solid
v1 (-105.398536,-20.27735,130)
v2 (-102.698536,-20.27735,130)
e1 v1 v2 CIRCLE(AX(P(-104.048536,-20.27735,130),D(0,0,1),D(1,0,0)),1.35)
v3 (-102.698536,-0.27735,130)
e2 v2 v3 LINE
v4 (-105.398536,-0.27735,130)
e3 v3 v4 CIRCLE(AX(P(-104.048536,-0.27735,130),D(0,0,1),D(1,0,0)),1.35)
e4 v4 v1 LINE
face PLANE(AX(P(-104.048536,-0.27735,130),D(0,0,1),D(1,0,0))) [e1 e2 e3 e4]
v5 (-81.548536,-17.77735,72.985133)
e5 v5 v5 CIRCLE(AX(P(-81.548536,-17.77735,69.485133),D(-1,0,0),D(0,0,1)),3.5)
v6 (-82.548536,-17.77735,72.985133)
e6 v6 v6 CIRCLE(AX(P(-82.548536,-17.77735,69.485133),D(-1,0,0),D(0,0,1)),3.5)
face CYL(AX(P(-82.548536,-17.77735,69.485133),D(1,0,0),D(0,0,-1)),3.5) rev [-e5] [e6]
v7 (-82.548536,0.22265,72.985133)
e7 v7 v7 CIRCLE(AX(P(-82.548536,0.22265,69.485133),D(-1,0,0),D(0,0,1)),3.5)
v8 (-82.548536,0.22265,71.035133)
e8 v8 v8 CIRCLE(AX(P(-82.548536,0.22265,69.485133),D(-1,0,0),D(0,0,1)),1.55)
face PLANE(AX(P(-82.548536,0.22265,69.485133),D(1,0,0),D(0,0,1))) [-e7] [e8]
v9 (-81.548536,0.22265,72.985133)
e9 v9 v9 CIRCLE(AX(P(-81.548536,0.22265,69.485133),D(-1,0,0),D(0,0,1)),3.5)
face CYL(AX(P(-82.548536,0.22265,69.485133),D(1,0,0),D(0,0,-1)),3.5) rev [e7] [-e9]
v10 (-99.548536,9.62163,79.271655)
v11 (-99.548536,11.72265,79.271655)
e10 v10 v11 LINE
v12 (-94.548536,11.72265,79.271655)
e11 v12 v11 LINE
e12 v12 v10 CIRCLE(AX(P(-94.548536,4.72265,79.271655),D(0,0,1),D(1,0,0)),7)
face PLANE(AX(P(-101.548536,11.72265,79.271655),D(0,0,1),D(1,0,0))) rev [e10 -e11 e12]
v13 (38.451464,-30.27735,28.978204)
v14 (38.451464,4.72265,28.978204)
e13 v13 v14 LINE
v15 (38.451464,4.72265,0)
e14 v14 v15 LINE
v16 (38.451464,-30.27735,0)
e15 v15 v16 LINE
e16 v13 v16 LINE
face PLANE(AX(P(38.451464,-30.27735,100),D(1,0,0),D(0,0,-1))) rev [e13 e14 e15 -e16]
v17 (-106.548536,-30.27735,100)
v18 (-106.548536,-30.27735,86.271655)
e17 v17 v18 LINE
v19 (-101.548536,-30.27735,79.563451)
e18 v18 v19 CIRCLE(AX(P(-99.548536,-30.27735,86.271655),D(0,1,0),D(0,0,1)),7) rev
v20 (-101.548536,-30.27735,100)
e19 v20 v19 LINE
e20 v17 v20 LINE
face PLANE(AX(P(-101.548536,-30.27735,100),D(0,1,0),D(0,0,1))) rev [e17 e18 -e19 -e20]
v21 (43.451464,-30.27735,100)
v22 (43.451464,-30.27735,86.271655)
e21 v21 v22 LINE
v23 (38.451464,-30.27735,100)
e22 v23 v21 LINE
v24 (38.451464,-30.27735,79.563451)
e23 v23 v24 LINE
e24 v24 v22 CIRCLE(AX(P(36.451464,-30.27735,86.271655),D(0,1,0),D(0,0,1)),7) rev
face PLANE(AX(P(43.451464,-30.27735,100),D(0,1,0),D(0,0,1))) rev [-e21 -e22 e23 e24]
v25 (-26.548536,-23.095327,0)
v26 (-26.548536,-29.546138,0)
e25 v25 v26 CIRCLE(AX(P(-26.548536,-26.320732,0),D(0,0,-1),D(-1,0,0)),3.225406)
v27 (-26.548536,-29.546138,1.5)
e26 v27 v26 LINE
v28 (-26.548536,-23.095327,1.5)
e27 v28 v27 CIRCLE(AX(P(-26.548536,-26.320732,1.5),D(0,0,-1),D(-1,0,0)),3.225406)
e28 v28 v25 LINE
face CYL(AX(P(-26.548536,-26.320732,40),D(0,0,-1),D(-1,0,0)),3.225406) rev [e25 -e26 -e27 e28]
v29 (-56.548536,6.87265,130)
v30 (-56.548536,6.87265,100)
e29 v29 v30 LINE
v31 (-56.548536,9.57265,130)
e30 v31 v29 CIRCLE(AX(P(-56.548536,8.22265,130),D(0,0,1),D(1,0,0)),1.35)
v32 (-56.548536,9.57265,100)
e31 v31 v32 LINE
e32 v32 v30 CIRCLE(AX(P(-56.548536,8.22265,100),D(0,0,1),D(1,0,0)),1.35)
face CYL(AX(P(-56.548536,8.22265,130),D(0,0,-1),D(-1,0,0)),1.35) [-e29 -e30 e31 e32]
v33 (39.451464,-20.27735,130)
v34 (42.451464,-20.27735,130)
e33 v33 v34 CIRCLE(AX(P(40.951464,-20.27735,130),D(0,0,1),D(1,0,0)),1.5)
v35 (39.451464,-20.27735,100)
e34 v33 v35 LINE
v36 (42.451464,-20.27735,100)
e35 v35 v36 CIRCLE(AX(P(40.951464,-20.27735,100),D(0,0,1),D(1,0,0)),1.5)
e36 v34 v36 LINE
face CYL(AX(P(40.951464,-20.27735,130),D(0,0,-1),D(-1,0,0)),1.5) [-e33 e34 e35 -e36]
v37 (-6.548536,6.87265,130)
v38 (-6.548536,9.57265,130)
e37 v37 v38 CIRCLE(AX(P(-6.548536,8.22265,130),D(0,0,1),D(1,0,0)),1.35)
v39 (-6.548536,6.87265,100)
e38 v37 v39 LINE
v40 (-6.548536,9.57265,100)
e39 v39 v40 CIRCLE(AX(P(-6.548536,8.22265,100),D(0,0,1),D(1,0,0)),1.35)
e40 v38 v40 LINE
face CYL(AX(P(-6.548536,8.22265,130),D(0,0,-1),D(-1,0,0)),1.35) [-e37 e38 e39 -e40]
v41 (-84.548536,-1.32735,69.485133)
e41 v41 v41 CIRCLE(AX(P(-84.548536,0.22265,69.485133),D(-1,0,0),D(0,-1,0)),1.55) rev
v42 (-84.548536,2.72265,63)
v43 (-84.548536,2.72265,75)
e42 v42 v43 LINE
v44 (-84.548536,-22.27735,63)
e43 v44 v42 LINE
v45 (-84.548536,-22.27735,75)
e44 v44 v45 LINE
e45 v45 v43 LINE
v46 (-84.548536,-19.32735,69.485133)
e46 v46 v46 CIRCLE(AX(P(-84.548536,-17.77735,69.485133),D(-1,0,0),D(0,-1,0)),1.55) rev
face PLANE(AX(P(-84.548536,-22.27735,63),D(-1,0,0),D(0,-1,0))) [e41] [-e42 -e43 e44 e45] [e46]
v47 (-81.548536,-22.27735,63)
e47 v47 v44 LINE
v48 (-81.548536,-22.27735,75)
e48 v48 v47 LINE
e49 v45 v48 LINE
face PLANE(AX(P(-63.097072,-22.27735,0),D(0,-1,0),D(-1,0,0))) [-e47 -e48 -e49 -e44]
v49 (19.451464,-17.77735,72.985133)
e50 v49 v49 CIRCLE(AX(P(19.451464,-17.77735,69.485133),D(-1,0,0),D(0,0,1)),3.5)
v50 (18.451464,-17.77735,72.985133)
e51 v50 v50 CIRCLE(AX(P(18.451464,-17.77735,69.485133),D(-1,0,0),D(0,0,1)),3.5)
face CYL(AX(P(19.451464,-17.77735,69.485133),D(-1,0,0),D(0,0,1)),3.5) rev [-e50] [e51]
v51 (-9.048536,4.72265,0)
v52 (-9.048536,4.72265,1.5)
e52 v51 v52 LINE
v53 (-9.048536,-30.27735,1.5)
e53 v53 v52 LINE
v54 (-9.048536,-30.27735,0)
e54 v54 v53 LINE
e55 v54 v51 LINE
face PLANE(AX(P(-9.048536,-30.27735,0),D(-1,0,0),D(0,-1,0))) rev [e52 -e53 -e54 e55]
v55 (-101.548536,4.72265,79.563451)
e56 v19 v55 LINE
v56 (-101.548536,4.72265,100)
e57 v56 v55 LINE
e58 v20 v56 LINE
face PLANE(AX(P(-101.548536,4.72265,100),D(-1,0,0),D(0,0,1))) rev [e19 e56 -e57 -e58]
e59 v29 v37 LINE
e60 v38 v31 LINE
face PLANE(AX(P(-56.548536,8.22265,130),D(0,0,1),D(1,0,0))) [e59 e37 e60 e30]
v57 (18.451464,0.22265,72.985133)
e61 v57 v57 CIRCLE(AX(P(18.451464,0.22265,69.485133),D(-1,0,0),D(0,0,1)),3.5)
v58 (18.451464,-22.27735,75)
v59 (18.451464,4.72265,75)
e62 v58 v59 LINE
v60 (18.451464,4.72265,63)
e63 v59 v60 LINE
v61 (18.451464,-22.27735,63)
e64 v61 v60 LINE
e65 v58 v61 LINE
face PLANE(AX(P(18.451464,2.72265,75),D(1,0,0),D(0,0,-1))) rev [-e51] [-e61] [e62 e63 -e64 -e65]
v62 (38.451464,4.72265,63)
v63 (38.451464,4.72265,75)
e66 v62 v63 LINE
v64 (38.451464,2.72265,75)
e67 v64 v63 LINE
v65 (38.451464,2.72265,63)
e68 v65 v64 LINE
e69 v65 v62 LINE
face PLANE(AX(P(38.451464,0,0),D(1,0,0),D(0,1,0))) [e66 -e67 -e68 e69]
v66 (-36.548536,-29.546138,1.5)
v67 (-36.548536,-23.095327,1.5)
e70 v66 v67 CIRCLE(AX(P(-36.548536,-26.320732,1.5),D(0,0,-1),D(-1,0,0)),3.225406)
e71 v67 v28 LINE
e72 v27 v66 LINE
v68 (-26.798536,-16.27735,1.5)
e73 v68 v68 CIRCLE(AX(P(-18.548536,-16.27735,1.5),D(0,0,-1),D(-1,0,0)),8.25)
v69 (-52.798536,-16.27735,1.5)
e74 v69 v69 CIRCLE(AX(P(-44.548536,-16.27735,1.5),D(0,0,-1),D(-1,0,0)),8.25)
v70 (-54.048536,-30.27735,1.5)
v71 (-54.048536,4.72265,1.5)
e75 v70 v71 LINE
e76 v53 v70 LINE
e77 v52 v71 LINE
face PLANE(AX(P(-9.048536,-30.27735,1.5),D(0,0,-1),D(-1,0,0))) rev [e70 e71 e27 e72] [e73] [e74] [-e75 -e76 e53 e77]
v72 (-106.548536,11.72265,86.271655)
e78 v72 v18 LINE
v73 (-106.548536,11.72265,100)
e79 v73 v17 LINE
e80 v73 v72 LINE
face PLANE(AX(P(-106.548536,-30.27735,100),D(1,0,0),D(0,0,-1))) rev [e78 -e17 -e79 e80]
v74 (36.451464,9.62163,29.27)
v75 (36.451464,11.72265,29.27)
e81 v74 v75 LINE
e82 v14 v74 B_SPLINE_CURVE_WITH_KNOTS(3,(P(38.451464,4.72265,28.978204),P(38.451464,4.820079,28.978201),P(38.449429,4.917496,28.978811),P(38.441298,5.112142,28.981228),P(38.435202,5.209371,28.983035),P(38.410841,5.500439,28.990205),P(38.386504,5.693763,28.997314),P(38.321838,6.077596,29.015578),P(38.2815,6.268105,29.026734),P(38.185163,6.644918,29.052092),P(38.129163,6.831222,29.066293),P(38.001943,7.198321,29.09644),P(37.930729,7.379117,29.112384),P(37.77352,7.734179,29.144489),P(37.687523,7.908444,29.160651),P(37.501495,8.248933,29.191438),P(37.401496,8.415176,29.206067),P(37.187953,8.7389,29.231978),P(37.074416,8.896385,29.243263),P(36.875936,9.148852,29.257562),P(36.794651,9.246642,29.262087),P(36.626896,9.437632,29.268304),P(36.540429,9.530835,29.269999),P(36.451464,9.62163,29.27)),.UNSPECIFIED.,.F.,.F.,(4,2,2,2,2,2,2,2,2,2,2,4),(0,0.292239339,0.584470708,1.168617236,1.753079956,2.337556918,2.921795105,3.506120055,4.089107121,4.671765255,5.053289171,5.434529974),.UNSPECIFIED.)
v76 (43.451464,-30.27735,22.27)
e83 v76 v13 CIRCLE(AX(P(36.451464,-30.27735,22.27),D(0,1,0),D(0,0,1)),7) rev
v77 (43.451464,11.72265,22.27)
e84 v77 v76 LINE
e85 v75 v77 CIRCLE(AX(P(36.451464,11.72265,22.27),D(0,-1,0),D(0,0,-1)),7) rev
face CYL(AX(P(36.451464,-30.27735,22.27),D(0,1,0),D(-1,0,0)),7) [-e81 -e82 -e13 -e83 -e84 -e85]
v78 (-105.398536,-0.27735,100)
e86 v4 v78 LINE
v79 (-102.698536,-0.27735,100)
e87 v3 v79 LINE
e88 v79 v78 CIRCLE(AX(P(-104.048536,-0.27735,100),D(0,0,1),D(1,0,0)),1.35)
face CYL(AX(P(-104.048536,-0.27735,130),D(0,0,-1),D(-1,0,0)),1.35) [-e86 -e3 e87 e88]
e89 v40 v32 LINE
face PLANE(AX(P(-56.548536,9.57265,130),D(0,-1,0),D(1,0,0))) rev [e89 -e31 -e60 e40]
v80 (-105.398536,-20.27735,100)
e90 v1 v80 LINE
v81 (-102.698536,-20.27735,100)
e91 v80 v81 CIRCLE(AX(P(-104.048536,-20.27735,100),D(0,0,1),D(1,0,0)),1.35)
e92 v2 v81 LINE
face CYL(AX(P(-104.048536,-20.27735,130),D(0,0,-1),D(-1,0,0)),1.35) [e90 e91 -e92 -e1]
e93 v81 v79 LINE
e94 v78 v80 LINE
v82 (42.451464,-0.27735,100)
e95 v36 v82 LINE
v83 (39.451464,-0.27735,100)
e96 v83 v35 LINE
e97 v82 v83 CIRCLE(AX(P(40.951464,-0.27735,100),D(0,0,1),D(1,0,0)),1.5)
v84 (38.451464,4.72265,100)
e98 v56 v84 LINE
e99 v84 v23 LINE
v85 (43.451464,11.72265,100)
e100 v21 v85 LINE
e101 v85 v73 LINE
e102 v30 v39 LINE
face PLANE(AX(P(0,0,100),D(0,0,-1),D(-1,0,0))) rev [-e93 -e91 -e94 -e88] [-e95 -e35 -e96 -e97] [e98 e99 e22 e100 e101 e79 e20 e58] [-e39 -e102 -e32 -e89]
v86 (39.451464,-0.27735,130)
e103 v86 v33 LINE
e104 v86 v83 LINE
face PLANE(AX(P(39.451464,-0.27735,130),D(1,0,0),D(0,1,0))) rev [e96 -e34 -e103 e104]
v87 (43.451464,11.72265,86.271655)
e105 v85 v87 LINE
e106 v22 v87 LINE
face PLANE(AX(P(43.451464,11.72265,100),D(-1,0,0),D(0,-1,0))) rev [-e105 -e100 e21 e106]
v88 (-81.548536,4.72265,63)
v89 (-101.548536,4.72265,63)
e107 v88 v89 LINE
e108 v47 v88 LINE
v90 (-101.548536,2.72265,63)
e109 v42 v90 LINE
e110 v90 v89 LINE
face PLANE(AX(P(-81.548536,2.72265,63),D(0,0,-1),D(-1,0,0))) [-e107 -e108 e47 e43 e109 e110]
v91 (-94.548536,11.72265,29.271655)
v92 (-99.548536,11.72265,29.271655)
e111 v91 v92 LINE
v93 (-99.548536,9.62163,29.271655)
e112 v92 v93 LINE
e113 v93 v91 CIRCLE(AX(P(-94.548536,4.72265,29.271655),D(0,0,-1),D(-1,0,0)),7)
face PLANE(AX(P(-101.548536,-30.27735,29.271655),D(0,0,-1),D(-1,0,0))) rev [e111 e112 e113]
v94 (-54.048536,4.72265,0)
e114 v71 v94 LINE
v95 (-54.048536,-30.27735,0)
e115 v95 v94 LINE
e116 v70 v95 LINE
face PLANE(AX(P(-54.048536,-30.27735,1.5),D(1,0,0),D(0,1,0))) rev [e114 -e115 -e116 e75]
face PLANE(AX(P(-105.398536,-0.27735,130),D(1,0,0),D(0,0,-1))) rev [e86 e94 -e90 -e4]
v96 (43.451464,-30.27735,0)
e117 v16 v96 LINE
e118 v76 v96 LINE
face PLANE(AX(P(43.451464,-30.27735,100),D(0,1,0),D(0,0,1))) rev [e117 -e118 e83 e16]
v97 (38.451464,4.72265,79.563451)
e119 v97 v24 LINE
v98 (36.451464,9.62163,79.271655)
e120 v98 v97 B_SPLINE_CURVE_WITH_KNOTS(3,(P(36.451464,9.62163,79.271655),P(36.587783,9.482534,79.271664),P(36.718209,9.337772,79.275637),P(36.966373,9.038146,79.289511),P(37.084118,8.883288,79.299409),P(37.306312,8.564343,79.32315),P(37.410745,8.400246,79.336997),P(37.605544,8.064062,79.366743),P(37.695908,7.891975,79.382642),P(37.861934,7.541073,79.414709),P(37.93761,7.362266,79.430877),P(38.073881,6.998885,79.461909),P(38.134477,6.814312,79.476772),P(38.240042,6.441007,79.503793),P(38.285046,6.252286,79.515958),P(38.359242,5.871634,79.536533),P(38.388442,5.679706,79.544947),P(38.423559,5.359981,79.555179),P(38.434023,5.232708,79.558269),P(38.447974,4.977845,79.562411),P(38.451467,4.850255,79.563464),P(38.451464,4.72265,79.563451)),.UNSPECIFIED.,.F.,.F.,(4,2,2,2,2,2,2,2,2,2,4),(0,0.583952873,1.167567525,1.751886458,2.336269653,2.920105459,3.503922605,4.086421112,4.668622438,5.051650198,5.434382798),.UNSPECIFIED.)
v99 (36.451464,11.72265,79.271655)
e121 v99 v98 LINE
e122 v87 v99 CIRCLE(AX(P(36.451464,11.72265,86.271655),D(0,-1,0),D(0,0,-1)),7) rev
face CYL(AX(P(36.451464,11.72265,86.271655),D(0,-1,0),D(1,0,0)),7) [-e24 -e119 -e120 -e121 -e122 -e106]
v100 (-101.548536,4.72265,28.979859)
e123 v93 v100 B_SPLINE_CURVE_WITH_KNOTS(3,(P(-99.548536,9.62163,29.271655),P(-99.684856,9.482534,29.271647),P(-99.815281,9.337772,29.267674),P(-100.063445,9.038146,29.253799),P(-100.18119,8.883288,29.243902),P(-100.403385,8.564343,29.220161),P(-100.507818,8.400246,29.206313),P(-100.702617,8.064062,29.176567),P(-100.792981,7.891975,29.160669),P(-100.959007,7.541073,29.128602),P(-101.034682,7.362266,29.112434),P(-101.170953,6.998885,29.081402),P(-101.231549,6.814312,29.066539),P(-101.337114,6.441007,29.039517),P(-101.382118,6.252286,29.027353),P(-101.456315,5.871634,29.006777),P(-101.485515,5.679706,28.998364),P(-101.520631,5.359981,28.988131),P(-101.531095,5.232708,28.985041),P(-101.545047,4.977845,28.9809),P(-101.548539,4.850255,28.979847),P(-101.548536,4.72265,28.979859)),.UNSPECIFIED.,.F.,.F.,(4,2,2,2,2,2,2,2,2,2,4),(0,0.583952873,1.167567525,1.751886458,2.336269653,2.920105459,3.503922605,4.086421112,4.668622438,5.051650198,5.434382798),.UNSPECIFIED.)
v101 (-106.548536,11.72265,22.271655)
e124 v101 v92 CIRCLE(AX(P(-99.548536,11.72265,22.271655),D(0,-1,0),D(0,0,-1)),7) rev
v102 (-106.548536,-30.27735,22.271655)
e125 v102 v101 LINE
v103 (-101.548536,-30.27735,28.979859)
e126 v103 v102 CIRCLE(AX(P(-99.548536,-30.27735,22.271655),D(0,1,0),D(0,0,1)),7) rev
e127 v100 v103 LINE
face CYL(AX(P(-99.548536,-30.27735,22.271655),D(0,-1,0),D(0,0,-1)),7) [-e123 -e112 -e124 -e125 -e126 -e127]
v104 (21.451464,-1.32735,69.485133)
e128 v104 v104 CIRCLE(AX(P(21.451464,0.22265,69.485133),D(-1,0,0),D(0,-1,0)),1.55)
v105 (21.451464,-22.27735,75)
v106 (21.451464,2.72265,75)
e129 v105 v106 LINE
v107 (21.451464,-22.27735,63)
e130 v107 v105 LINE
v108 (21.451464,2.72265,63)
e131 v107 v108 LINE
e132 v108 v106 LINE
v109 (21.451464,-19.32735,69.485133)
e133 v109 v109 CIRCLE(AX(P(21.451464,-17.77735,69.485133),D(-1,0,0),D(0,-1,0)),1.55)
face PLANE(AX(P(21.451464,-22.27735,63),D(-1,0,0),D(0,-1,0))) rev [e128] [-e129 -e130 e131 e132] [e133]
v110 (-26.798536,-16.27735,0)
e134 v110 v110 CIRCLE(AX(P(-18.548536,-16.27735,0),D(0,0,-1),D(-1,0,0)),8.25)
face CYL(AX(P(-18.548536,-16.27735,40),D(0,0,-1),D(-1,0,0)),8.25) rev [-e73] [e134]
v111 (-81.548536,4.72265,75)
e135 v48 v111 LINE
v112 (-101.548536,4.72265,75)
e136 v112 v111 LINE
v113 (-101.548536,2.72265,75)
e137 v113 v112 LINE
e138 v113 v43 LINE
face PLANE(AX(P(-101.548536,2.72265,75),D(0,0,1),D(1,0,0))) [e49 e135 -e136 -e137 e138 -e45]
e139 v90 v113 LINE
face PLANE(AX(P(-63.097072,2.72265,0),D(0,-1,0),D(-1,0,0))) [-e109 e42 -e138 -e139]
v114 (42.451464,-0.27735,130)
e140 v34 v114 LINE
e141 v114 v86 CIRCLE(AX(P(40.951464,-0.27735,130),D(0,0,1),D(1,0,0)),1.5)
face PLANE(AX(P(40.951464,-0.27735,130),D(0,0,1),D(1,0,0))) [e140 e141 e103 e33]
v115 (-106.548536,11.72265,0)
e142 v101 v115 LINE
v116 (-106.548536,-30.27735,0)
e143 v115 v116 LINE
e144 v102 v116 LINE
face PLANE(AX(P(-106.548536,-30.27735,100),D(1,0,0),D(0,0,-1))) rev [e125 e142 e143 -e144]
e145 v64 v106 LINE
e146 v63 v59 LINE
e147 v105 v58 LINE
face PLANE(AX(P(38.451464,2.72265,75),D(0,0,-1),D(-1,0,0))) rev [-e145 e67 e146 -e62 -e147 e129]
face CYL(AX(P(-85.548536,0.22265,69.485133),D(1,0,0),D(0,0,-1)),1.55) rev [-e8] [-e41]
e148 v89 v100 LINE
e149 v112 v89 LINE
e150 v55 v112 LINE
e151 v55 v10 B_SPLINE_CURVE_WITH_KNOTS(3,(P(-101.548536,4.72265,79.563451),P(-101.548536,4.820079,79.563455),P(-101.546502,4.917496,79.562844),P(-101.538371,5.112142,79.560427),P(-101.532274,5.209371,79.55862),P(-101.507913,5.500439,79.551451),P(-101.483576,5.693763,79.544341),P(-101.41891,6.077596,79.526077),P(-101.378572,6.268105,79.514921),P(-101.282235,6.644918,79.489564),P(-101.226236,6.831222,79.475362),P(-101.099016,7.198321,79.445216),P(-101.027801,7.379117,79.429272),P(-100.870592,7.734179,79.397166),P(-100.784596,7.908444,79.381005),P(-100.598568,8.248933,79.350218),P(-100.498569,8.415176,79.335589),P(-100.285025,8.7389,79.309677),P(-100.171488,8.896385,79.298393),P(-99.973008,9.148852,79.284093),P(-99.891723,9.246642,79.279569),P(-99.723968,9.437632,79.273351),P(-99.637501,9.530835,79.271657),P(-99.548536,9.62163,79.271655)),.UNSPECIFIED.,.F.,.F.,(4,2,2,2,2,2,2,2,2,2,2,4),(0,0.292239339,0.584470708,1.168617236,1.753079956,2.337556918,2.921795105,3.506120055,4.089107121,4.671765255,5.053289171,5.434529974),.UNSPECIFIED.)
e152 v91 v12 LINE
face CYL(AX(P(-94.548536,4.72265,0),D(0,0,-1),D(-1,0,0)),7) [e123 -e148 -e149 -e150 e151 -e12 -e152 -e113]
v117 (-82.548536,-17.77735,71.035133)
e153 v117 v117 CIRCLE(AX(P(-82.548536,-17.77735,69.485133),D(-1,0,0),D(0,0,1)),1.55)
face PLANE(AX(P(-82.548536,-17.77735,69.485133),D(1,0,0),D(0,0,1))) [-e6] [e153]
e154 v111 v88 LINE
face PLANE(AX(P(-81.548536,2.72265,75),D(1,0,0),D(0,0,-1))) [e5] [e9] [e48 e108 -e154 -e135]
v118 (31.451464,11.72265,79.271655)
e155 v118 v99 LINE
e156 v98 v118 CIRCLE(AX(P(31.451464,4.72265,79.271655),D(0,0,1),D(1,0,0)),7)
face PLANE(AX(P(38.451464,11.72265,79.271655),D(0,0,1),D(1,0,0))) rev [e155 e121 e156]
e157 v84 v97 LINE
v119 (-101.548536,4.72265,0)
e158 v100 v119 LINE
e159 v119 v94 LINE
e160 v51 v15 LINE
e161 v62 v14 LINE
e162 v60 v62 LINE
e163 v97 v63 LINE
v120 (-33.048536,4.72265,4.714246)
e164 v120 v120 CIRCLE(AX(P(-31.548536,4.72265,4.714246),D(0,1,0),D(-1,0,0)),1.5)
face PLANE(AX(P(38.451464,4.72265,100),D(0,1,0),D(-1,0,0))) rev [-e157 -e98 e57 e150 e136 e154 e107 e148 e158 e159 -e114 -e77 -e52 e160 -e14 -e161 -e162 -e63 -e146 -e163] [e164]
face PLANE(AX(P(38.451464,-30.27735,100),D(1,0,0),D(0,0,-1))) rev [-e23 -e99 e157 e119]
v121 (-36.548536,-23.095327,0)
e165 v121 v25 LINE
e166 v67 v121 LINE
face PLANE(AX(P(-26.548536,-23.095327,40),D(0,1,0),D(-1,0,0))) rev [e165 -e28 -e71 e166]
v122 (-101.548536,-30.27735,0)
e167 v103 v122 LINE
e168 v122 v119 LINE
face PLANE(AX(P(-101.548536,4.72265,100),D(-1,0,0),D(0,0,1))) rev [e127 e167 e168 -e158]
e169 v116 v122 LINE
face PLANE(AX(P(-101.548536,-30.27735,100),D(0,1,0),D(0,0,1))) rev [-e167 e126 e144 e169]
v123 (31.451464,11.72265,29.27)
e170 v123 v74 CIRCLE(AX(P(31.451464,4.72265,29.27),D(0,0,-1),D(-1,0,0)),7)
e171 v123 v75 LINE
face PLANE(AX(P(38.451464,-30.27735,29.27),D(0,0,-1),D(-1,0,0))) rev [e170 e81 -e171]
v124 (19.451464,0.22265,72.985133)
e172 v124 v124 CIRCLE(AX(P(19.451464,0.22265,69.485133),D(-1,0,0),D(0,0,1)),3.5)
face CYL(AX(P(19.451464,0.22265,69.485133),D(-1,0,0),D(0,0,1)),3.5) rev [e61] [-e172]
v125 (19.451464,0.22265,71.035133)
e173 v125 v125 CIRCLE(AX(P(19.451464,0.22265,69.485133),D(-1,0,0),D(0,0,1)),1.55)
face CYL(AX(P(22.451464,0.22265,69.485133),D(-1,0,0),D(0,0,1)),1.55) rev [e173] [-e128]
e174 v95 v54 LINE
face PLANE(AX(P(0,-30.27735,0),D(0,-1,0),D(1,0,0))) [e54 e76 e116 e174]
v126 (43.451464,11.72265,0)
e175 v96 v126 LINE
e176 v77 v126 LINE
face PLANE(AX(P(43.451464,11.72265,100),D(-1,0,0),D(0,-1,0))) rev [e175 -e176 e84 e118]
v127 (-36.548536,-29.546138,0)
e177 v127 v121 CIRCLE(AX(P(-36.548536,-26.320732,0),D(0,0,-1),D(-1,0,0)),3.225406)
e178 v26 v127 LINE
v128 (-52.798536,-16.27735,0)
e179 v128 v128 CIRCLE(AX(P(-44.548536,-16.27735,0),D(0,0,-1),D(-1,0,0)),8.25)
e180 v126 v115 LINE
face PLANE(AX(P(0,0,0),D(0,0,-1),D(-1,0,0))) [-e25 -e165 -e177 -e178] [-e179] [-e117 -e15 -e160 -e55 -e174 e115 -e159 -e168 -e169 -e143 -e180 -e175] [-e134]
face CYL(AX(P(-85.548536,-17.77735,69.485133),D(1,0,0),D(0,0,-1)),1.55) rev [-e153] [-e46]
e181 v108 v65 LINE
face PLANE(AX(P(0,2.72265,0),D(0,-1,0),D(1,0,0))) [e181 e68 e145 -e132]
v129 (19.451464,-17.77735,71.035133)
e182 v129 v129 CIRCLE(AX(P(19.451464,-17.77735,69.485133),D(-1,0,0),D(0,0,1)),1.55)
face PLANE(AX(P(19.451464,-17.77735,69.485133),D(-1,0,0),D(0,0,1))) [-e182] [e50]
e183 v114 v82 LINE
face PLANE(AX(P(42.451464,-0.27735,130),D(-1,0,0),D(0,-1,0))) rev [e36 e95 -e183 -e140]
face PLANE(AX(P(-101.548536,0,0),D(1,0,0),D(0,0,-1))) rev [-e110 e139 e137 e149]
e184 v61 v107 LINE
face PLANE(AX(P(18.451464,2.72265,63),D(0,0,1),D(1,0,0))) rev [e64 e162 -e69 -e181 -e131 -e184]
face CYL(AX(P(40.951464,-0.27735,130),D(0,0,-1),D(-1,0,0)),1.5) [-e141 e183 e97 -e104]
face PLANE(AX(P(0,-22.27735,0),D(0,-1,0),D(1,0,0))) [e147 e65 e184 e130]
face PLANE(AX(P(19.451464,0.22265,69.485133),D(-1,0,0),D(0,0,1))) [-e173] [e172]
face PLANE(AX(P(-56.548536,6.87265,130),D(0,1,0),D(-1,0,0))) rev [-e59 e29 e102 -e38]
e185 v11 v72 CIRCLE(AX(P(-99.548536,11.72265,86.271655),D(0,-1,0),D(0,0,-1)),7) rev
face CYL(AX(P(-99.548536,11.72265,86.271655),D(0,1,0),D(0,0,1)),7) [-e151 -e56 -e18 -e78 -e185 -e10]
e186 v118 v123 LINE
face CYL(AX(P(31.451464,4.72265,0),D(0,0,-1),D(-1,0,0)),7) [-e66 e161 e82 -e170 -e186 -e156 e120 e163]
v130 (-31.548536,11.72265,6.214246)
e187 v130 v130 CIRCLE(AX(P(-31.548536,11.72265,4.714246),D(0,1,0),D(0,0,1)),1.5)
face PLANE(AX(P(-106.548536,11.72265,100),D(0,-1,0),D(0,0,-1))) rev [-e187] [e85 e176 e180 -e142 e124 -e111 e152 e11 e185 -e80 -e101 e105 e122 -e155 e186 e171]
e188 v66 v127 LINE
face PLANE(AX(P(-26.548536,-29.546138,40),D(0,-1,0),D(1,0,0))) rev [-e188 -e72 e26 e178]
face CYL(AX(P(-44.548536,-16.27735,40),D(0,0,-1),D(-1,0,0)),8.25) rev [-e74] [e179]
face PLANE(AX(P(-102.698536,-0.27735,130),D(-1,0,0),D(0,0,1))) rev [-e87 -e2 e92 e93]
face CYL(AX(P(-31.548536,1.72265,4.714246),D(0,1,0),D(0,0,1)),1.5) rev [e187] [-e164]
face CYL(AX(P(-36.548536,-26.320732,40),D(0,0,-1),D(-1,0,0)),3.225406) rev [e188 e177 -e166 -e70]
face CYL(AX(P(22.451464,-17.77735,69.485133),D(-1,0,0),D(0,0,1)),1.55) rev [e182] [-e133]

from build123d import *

# Parameters (mm, degrees)
BOSS_EXTRUDE2_DEPTH = 100
BOSS_EXTRUDE3_DEPTH = 30
SKETCH10_R          = 7.5
CUT_EXTRUDE2_DEPTH  = 210
SKETCH15_R          = 1.5
CUT_EXTRUDE3_DEPTH  = 10
SKETCH16_W          = 20
SKETCH16_H          = 12
BOSS_EXTRUDE5_DEPTH = 2
SKETCH17_W          = 3
SKETCH17_H          = 12
BOSS_EXTRUDE6_DEPTH = 25
SKETCH19_R          = 3.5
CUT_EXTRUDE4_DEPTH  = 1
SKETCH20_R          = 1.55
CUT_EXTRUDE5_DEPTH  = 3
SKETCH21_W          = 45
SKETCH21_H          = 1.5
BOSS_EXTRUDE7_DEPTH = 35
SKETCH23_R          = 8.25
CUT_EXTRUDE6_DEPTH  = 40
CUT_EXTRUDE7_DEPTH  = 40
SKETCH26_W          = 50
SKETCH26_H          = 42
CUT_EXTRUDE8_DEPTH  = 5
FILLET1_R           = 7
FILLET3_R           = 7
FILLET4_R           = 7
SKETCH27_W          = 50.001655339
SKETCH27_H          = 42
CUT_EXTRUDE9_DEPTH  = 5
FILLET5_R           = 7
FILLET6_R           = 7
FILLET7_R           = 7


# Some blends are built 0.0001 mm under size
with BuildPart() as part:
    # Sketch3 → Boss-Extrude2 (new body)
    with BuildSketch(Plane.XY):
        Polygon((-106.54853621, -30.277349769), (-106.54853621, 11.722650231), (43.45146379, 11.722650231), (43.45146379, -30.277349769), (38.45146379, -30.277349769), (38.45146379, 4.722650231), (-101.54853621, 4.722650231), (-101.54853621, -30.277349769), align=None)
    extrude(amount=BOSS_EXTRUDE2_DEPTH)

    # Sketch4 → Boss-Extrude3 (add)
    with BuildSketch(Plane.XY.offset(100)):
        with BuildLine():
            Line((-102.69853621, -0.277349769), (-102.69853621, -20.277349769))
            ThreePointArc((-102.69853621, -20.277349769), (-104.04853621, -21.627349769), (-105.39853621, -20.277349769))
            Line((-105.39853621, -20.277349769), (-105.39853621, -0.277349769))
            ThreePointArc((-105.39853621, -0.277349769), (-104.04853621, 1.072650231), (-102.69853621, -0.277349769))
        make_face()
        with BuildLine():
            Line((-56.54853621, 9.572650231), (-6.54853621, 9.572650231))
            ThreePointArc((-6.54853621, 9.572650231), (-5.19853621, 8.222650231), (-6.54853621, 6.872650231))
            Line((-6.54853621, 6.872650231), (-56.54853621, 6.872650231))
            ThreePointArc((-56.54853621, 6.872650231), (-57.89853621, 8.222650231), (-56.54853621, 9.572650231))
        make_face()
        with BuildLine():
            Line((42.45146379, -0.277349769), (42.45146379, -20.277349769))
            ThreePointArc((42.45146379, -20.277349769), (40.95146379, -21.777349769), (39.45146379, -20.277349769))
            Line((39.45146379, -20.277349769), (39.45146379, -0.277349769))
            ThreePointArc((39.45146379, -0.277349769), (40.95146379, 1.222650231), (42.45146379, -0.277349769))
        make_face()
    extrude(amount=BOSS_EXTRUDE3_DEPTH)

    # Sketch10 → Cut-Extrude2 (cut)
    with BuildSketch(Plane(origin=(43.45146379, 0, 0), x_dir=(0, 0, -1), z_dir=(1, 0, 0))):
        with Locations((-45, -8.277349769)):
            Circle(SKETCH10_R)
    extrude(amount=-CUT_EXTRUDE2_DEPTH, mode=Mode.SUBTRACT)

    # Sketch15 → Cut-Extrude3 (cut)
    with BuildSketch(Plane(origin=(0, 11.722650231, 0), x_dir=(1, 0, 0), z_dir=(0, 1, 0))):
        with Locations(Location((-31.54853621, -4.714245873, 0), (0, 0, 270))):
            Circle(SKETCH15_R)
    extrude(amount=-CUT_EXTRUDE3_DEPTH, mode=Mode.SUBTRACT)

    # Sketch16 → Boss-Extrude5 (add)
    with BuildSketch(Plane.XZ.offset(-4.722650231)):
        with Locations((28.45146379, 69)):
            Rectangle(SKETCH16_W, SKETCH16_H)
    boss_extrude5 = extrude(amount=BOSS_EXTRUDE5_DEPTH)

    # Sketch17 → Boss-Extrude6 (add)
    with BuildSketch(Plane(origin=(0, 2.722650231, 0), x_dir=(-1, 0, 0), z_dir=(0, -1, 0))):
        with Locations((-19.95146379, -69)):
            Rectangle(SKETCH17_W, SKETCH17_H)
    boss_extrude6 = extrude(amount=BOSS_EXTRUDE6_DEPTH)

    # Sketch19 → Cut-Extrude4 (cut)
    with BuildSketch(Plane.ZY.offset(-18.45146379)):
        with Locations((69.485133357, 0.222650231)):
            Circle(SKETCH19_R)
        with Locations((69.485133357, -17.777349769)):
            Circle(SKETCH19_R)
    cut_extrude4 = extrude(amount=-CUT_EXTRUDE4_DEPTH, mode=Mode.SUBTRACT)

    # Sketch20 → Cut-Extrude5 (cut)
    with BuildSketch(Plane.ZY.offset(-19.45146379)):
        with Locations((69.485133357, 0.222650231)):
            Circle(SKETCH20_R)
        with Locations((69.485133357, -17.777349769)):
            Circle(SKETCH20_R)
    cut_extrude5 = extrude(amount=-CUT_EXTRUDE5_DEPTH, mode=Mode.SUBTRACT)

    # Mirror6: Boss-Extrude5, Boss-Extrude6, Cut-Extrude4, Cut-Extrude5 across plane
    add(boss_extrude5.mirror(Plane.ZY.offset(31.54853621)))
    add(boss_extrude6.mirror(Plane.ZY.offset(31.54853621)))
    add(cut_extrude4.mirror(Plane.ZY.offset(31.54853621)), mode=Mode.SUBTRACT)
    add(cut_extrude5.mirror(Plane.ZY.offset(31.54853621)), mode=Mode.SUBTRACT)

    # Sketch21 → Boss-Extrude7 (add)
    with BuildSketch(Plane.XZ.offset(-4.722650231)):
        with Locations((-31.54853621, 0.75)):
            Rectangle(SKETCH21_W, SKETCH21_H)
    extrude(amount=BOSS_EXTRUDE7_DEPTH)

    # Sketch23 → Cut-Extrude6 (cut)
    with BuildSketch(Plane(origin=(0, 0, 0), x_dir=(-1, 0, 0), z_dir=(0, 0, -1))):
        with Locations((44.54853621, -16.277349769)):
            Circle(SKETCH23_R)
        with Locations((18.54853621, -16.277349769)):
            Circle(SKETCH23_R)
    extrude(amount=-CUT_EXTRUDE6_DEPTH, mode=Mode.SUBTRACT)

    # Sketch24 → Cut-Extrude7 (cut)
    with BuildSketch(Plane(origin=(0, 0, 0), x_dir=(-1, 0, 0), z_dir=(0, 0, -1))):
        with BuildLine():
            Line((26.54853621, -23.095326639), (36.54853621, -23.095326639))
            ThreePointArc((36.54853621, -23.095326639), (39.773941895, -26.320732325), (36.54853621, -29.54613801))
            Line((36.54853621, -29.54613801), (26.54853621, -29.54613801))
            ThreePointArc((26.54853621, -29.54613801), (23.323130524, -26.320732325), (26.54853621, -23.095326639))
        make_face()
    extrude(amount=-CUT_EXTRUDE7_DEPTH, mode=Mode.SUBTRACT)

    # Sketch26 → Cut-Extrude8 (cut)
    with BuildSketch(Plane.ZY.offset(106.54853621)):
        with Locations((54.271655339, -9.277349769)):
            Rectangle(SKETCH26_W, SKETCH26_H)
    extrude(amount=-CUT_EXTRUDE8_DEPTH, mode=Mode.SUBTRACT)

    # Fillet1
    fillet1_edges = [part.edges().sort_by_distance(p)[0] for p in [
        (-101.54853621, 11.722650231, 54.271655339),
    ]]
    fillet(fillet1_edges, radius=FILLET1_R - 0.0001)  # a hair under: the kernel refuses the full size

    # Fillet3
    # the kernel refuses this fillet: 7 mm, written as the material it takes off along each edge
    with BuildSketch(Plane(origin=(-106.54853621, -47.777349769, 29.271655339), x_dir=(0, 0, -1), z_dir=(0, 1, 0))) as fillet3_piece_1_section:
        with BuildLine():
            CenterArc((FILLET3_R, -FILLET3_R), FILLET3_R, 90, 90)
            Line((0, -FILLET3_R), (0, 0))
            Line((0, 0), (FILLET3_R, 0))
        make_face()
    fillet3_piece_1 = extrude(amount=77, mode=Mode.PRIVATE)
    fillet3_piece_1 = fillet3_piece_1 - Plane(origin=(-94.54863621, 4.722750231, 27.624323614), x_dir=(0, 1, 0), z_dir=(0, 0, 1)) * Cylinder(6.9999, 182, mode=Mode.PRIVATE)
    add(fillet3_piece_1, mode=Mode.SUBTRACT)

    # Fillet4
    # the kernel refuses this fillet: 7 mm, written as the material it takes off along each edge
    with BuildSketch(Plane(origin=(-106.54853621, 29.222650231, 79.271655339), x_dir=(0, 0, 1), z_dir=(0, -1, 0))) as fillet4_piece_1_section:
        with BuildLine():
            CenterArc((FILLET4_R, -FILLET4_R), FILLET4_R, 90, 90)
            Line((0, -FILLET4_R), (0, 0))
            Line((0, 0), (FILLET4_R, 0))
        make_face()
    fillet4_piece_1 = extrude(amount=77, mode=Mode.PRIVATE)
    fillet4_piece_1 = fillet4_piece_1 - Plane(origin=(-94.54863621, 4.722750231, 80.918987064), x_dir=(0, 1, 0), z_dir=(0, 0, 1)) * Cylinder(6.9999, 182, mode=Mode.PRIVATE)
    add(fillet4_piece_1, mode=Mode.SUBTRACT)

    # Sketch27 → Cut-Extrude9 (cut)
    with BuildSketch(Plane(origin=(43.45146379, 0, 0), x_dir=(0, 0, -1), z_dir=(1, 0, 0))):
        with Locations((-54.27082767, -9.277349769)):
            Rectangle(SKETCH27_W, SKETCH27_H)
    extrude(amount=-CUT_EXTRUDE9_DEPTH, mode=Mode.SUBTRACT)

    # Fillet5
    fillet5_edges = [part.edges().sort_by_distance(p)[0] for p in [
        (38.45146379, 11.722650231, 54.270827669),
    ]]
    fillet(fillet5_edges, radius=FILLET5_R - 0.0001)  # a hair under: the kernel refuses the full size

    # Fillet6
    # the kernel refuses this fillet: 7 mm, written as the material it takes off along each edge
    with BuildSketch(Plane(origin=(43.45146379, -47.777349769, 29.27), x_dir=(0, 0, -1), z_dir=(0, 1, 0))) as fillet6_piece_1_section:
        with BuildLine():
            CenterArc((FILLET6_R, FILLET6_R), FILLET6_R, 180, 90)
            Line((0, FILLET6_R), (0, 0))
            Line((0, 0), (FILLET6_R, 0))
        make_face()
    fillet6_piece_1 = extrude(amount=77, mode=Mode.PRIVATE)
    fillet6_piece_1 = fillet6_piece_1 - Plane(origin=(31.45156379, 4.722750231, 27.622668275), x_dir=(0, 1, 0), z_dir=(0, 0, 1)) * Cylinder(6.9999, 182, mode=Mode.PRIVATE)
    add(fillet6_piece_1, mode=Mode.SUBTRACT)

    # Fillet7
    # the kernel refuses this fillet: 7 mm, written as the material it takes off along each edge
    with BuildSketch(Plane(origin=(43.45146379, 29.222650231, 79.271655339), x_dir=(-1, 0, 0), z_dir=(0, -1, 0))) as fillet7_piece_1_section:
        with BuildLine():
            CenterArc((FILLET7_R, -FILLET7_R), FILLET7_R, 90, 90)
            Line((0, -FILLET7_R), (0, 0))
            Line((0, 0), (FILLET7_R, 0))
        make_face()
    fillet7_piece_1 = extrude(amount=77, mode=Mode.PRIVATE)
    fillet7_piece_1 = fillet7_piece_1 - Plane(origin=(31.45156379, 4.722750231, 79.268302474), x_dir=(0, 1, 0), z_dir=(0, 0, 1)) * Cylinder(6.9999, 183, mode=Mode.PRIVATE)
    add(fillet7_piece_1, mode=Mode.SUBTRACT)


solid = part.part
